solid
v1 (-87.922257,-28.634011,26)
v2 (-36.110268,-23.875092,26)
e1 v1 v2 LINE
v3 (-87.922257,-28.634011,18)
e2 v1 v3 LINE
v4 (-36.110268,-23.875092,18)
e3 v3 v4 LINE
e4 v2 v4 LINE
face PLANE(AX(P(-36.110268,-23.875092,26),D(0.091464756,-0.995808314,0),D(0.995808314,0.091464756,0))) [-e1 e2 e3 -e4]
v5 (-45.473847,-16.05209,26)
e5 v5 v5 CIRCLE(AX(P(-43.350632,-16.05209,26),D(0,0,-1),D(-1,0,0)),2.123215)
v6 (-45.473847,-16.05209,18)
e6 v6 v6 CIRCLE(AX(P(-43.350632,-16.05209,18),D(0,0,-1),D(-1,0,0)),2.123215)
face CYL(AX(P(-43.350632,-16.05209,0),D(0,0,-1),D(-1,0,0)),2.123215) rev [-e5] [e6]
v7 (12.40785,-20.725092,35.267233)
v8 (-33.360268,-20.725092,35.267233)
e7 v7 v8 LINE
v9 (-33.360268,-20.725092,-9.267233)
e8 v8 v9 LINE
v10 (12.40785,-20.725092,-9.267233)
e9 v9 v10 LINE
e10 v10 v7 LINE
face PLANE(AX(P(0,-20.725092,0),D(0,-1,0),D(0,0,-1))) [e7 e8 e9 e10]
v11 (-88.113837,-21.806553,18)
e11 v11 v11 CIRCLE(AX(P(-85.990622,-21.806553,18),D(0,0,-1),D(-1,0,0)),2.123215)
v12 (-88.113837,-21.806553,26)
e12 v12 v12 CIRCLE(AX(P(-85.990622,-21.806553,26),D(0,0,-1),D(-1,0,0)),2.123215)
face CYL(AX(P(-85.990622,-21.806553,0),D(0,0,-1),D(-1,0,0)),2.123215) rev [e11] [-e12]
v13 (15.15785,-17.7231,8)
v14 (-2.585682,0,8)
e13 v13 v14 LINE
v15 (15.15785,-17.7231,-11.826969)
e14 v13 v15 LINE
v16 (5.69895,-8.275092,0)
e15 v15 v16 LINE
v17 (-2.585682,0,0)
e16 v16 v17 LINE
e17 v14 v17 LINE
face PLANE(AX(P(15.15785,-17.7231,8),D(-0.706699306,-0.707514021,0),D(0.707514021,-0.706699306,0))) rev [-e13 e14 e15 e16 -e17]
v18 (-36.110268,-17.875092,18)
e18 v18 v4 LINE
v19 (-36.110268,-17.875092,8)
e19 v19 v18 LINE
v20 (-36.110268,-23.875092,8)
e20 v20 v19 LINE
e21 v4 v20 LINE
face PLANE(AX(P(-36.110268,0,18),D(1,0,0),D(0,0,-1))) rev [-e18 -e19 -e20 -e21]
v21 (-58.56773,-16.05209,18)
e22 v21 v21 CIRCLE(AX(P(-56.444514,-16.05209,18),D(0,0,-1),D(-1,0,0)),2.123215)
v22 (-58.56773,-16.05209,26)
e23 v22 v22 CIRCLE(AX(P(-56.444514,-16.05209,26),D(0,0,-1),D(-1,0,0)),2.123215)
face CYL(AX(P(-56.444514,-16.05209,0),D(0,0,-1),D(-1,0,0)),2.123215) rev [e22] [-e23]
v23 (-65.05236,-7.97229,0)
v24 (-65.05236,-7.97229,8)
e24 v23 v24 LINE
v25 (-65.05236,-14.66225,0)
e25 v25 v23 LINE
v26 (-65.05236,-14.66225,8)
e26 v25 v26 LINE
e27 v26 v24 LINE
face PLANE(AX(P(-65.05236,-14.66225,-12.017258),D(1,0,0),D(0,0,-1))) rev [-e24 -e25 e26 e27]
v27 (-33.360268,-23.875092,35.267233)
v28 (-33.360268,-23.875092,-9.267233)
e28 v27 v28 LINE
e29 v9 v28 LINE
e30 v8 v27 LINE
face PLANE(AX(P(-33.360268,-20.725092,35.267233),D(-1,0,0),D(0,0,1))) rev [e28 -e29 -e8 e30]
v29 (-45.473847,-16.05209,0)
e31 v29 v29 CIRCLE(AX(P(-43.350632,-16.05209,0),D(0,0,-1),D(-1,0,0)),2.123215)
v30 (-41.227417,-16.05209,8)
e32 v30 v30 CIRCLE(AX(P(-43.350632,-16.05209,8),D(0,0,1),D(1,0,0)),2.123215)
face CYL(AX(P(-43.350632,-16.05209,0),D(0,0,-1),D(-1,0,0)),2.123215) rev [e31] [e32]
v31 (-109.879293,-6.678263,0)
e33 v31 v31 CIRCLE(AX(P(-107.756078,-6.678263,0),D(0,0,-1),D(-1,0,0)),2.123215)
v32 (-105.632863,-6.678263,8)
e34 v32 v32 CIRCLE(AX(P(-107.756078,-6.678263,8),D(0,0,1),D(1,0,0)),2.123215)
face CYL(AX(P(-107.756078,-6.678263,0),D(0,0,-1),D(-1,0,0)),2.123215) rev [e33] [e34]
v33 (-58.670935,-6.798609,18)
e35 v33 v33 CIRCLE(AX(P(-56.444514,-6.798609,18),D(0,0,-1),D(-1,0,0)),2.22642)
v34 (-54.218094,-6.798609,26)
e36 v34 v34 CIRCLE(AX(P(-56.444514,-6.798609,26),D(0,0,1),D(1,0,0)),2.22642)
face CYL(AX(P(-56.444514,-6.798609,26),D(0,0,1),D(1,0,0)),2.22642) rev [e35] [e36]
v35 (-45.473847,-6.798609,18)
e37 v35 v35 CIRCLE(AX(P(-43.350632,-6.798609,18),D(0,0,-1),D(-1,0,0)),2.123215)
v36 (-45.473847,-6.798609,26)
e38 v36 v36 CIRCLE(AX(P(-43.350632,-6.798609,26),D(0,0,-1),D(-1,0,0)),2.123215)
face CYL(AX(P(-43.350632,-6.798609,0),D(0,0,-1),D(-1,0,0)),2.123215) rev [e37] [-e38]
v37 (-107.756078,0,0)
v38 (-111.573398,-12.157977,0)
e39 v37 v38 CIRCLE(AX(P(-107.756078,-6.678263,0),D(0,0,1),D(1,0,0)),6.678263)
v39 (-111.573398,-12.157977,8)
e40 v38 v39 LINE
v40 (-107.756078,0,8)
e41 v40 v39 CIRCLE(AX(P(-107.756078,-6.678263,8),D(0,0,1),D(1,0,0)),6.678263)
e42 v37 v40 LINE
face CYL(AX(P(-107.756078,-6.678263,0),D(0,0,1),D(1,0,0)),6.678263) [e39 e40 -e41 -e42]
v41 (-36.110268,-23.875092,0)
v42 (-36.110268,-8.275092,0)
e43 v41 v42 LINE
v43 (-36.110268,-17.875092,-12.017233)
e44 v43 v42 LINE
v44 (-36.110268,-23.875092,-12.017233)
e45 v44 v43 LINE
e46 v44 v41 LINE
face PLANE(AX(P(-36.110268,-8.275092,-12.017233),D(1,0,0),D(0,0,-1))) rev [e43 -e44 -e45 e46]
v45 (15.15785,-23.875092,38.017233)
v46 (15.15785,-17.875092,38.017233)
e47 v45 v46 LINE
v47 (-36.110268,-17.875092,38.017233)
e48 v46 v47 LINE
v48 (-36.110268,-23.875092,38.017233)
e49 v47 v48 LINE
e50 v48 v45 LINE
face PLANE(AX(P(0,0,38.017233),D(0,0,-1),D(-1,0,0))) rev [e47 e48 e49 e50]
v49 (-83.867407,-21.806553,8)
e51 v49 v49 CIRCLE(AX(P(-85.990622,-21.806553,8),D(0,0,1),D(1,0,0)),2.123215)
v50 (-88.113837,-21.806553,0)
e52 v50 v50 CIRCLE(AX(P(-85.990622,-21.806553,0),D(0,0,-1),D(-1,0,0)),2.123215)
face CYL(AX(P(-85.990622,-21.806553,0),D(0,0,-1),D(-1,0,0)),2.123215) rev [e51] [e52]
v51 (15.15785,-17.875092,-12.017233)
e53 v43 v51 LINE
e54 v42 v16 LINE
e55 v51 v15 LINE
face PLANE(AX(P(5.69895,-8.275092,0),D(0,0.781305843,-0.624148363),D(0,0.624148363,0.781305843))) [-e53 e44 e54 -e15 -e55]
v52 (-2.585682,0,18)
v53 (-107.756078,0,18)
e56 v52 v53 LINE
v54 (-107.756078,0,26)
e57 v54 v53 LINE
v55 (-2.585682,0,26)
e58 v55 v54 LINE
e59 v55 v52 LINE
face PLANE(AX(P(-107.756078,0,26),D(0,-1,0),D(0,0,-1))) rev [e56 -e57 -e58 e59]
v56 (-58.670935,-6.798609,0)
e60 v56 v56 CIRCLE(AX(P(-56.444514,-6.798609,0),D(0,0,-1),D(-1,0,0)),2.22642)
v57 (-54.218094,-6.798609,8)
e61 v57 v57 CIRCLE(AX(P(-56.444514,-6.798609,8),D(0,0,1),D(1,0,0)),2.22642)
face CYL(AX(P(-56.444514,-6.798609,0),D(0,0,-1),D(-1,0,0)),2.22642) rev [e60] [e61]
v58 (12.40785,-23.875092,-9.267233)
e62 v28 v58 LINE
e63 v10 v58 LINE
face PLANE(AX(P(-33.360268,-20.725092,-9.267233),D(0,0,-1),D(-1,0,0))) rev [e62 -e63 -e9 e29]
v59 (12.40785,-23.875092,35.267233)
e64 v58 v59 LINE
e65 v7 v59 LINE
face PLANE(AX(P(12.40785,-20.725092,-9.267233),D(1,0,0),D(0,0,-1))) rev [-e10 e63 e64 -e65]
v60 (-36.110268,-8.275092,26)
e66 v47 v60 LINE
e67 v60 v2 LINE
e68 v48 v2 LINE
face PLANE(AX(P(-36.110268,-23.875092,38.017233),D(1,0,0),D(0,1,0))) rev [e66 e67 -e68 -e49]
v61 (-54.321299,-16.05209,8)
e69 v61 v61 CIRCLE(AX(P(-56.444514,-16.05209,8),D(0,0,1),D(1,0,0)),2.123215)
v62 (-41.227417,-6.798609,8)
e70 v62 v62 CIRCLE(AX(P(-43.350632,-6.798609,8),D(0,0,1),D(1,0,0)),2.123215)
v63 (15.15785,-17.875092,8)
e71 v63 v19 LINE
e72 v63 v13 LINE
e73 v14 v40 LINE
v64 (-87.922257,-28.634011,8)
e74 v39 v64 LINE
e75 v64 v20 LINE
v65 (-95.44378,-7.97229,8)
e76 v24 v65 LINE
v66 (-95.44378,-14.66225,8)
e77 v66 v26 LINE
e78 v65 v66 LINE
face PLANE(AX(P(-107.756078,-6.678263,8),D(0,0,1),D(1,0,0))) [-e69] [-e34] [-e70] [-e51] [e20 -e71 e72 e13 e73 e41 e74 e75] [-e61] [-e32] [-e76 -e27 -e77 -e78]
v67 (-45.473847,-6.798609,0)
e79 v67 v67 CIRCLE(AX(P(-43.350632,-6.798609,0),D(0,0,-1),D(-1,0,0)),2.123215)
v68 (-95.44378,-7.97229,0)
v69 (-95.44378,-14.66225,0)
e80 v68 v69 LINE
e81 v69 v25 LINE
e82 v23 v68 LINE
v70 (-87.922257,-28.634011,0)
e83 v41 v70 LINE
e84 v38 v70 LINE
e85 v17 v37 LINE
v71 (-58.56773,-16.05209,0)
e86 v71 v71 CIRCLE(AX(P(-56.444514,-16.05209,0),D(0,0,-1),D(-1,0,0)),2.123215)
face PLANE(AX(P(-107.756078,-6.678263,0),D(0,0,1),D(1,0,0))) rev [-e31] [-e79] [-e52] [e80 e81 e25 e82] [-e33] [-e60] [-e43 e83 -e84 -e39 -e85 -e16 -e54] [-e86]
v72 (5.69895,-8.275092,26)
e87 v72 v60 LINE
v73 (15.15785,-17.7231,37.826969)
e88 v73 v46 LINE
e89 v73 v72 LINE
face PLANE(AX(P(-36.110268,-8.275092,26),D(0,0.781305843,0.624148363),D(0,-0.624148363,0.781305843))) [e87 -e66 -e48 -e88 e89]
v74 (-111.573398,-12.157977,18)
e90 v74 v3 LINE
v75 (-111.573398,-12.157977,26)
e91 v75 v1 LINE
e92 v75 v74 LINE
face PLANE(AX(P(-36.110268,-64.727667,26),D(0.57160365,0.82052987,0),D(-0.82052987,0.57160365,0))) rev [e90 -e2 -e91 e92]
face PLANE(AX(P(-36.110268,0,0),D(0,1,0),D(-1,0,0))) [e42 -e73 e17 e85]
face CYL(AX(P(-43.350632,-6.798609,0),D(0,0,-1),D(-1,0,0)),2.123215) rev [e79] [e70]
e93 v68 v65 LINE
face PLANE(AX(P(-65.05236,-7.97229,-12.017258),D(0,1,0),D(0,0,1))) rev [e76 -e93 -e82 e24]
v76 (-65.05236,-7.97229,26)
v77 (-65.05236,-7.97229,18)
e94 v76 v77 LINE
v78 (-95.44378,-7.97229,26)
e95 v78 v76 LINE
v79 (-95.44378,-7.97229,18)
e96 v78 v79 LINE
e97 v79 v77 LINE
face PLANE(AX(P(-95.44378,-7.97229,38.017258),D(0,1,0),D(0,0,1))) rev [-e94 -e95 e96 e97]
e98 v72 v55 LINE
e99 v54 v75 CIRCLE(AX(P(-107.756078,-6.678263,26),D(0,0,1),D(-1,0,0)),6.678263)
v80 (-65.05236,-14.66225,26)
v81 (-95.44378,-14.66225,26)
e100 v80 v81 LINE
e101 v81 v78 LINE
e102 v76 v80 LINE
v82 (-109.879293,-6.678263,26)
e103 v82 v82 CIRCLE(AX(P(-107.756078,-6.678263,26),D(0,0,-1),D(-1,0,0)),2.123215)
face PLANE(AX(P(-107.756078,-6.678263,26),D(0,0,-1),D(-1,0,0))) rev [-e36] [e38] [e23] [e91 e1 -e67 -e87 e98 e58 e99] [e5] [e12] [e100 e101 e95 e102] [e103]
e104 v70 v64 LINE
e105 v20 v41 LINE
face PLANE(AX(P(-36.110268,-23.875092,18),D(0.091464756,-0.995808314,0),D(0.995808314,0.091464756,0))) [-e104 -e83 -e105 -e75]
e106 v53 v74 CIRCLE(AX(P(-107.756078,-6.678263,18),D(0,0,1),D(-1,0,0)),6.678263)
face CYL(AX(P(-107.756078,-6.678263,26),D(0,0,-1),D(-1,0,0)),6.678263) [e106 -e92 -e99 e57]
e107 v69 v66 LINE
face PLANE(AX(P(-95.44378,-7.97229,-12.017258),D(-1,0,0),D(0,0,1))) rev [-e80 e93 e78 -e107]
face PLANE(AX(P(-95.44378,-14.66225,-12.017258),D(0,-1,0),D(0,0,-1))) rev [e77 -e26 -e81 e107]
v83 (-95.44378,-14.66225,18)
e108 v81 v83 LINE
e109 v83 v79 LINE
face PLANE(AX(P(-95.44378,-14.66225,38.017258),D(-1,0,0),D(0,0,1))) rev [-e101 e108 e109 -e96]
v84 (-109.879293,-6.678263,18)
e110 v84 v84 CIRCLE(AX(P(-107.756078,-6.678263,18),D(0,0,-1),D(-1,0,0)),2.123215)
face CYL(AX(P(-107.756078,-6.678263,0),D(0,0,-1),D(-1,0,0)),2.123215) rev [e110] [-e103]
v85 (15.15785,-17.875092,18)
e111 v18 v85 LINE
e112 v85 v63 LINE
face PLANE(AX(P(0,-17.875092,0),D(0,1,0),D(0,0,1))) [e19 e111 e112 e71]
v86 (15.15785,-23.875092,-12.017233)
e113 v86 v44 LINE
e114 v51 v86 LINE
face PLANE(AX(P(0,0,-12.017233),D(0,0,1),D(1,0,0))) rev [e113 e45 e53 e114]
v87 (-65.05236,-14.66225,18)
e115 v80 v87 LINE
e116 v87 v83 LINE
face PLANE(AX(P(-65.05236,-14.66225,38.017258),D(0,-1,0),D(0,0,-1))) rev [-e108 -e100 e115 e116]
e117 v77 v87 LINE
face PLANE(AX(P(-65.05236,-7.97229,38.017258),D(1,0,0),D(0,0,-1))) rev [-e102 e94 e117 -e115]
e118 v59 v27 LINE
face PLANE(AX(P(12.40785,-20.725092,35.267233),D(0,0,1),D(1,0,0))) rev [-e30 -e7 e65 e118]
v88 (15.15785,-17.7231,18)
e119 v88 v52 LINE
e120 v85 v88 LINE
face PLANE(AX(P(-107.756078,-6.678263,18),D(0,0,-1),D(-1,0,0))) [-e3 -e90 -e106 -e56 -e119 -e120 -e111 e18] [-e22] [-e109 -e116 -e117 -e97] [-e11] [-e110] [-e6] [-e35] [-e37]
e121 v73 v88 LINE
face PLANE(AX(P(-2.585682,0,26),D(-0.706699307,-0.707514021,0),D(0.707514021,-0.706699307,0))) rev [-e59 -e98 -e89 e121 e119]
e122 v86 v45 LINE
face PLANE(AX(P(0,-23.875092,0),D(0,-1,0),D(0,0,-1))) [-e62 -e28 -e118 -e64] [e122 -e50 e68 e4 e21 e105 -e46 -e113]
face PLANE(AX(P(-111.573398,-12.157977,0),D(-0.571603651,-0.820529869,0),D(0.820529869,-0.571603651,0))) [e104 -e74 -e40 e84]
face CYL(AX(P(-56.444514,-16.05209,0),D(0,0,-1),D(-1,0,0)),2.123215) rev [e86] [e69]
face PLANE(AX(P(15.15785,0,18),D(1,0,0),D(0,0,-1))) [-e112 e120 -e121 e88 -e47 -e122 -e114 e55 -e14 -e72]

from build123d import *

# Parameters (mm, degrees)
RESSALTO_EXTRUS_O1_DEPTH         = 8
RESSALTO_EXTRUS_O2_DEPTH         = 51.268117765
CORTE_EXTRUS_O1_DEPTH            = 8.000000002
ESBO_O4_W                        = 51.268117776
ESBO_O4_H                        = 10.000000011
CORTE_EXTRUS_O2_DEPTH            = 17.723100001
CORTE_EXTRUS_O3_DEPTH            = 40.852574409
ESBO_O6_W                        = 51.268117776
ESBO_O6_H                        = 10.000000011
CORTE_EXTRUS_O4_DEPTH            = 0.151992449
RESSALTO_EXTRUS_O3_START         = 7.999999998
RESSALTO_EXTRUS_O3_DEPTH         = 7.999999998
RESSALTO_EXTRUS_O4_DEPTH         = 12.017232655
RESSALTO_EXTRUS_O5_DEPTH         = 12.017232657
ESBO_O10_W                       = 30.391419991
ESBO_O10_H                       = 6.689959998
CORTE_EXTRUS_O5_DEPTH            = 135.855194678
ESBO_O11_W                       = 30.391419991
ESBO_O11_H                       = 6.689959998
CORTE_EXTRUS_O6_DEPTH            = 135.855194677
ESBO_O12_W                       = 45.768117767
ESBO_O12_H                       = 44.53446532
CORTE_EXTRUS_O7_DEPTH            = 3.15
INCLINA_O1_START                 = 9.762479363
INCLINA_O1_DEPTH                 = 8.237520637
INCLINA_O2_START                 = -6.465378083
INCLINA_O2_DEPTH                 = 8.465378083
INCLINA_O3_ANGLE                 = 84.752120974
FURO_COM_FOLGA_DE_M41_D          = 4.452840696
FURO_COM_FOLGA_DE_M41_DEPTH      = 7.999999998
FURO_DE_DI_METRO_4_2_4_2_1_D     = 4.2
FURO_DE_DI_METRO_4_2_4_2_1_DEPTH = 7.999999998
FURO_COM_FOLGA_DE_M42_D          = 4.452840696
FURO_COM_FOLGA_DE_M42_DEPTH      = 38.017232657
FURO1_D                          = 4.246430182
FURO1_DEPTH                      = 38.017232657


with BuildPart() as part:
    # Esboço1 → Ressalto-extrusão1 (new body)
    with BuildSketch(Plane.XY.offset(8)):
        with BuildLine():
            Line((-36.110267765, -64.727666859), (-36.110267765, 0))
            Line((-36.110267765, 0), (-107.75607805, 0))
            ThreePointArc((-107.75607805, 0), (-114.12766225, -4.677735132), (-111.573397577, -12.157977319))
            Line((-111.573397577, -12.157977319), (-36.110267765, -64.727666859))
        make_face()
    extrude(amount=-RESSALTO_EXTRUS_O1_DEPTH)

    # Esboço2 → Ressalto-extrusão2 (add)
    with BuildSketch(Plane(origin=(-36.110267765, 0, 0), x_dir=(0, 0, -1), z_dir=(1, 0, 0))):
        with BuildLine():
            Line((2e-09, 1e-09), (2e-09, -23.87509245))
            add(Edge.make_bspline(
                [(2e-09, -64.727666859), (2e-09, -51.110142056), (2e-09, -37.492617253), (2e-09, -23.87509245)],
                knots=[0, 0, 0, 0, 1, 1, 1, 1], degree=3))
            Line((2e-09, -64.727666859), (-18.000000002, -64.727666859))
            add(Edge.make_bspline(
                [(-18.000000002, -64.727666859), (-18.000000002, -51.110142056), (-18.000000002, -37.492617253), (-18.000000002, -23.87509245)],
                knots=[0, 0, 0, 0, 1, 1, 1, 1], degree=3))
            Line((-18.000000002, -23.87509245), (-18.000000002, -17.875092449))
            add(Edge.make_bspline(
                [(-18.000000002, -17.723099999), (-18.000000002, -17.773764149), (-18.000000002, -17.824428299), (-18.000000002, -17.875092449)],
                knots=[0, 0, 0, 0, 1, 1, 1, 1], degree=3))
            add(Edge.make_bspline(
                [(-18.000000002, 1e-09), (-18.000000002, -5.907699999), (-18.000000002, -11.815399999), (-18.000000002, -17.723099999)],
                knots=[0, 0, 0, 0, 1, 1, 1, 1], degree=3))
            Line((-18.000000002, 1e-09), (2e-09, 1e-09))
        make_face()
    extrude(amount=RESSALTO_EXTRUS_O2_DEPTH)

    # Esboço3 → Corte-extrusão1 (cut)
    with BuildSketch(Plane(origin=(0, 0, 0), x_dir=(-1, 0, 0), z_dir=(0, 0, -1))):
        Polygon((-15.15785, 0), (-15.15785, -17.7231), (2.585682, 0), align=None)
    extrude(amount=-CORTE_EXTRUS_O1_DEPTH, mode=Mode.SUBTRACT)

    # Esboço4 → Corte-extrusão2 (cut)
    with BuildSketch(Plane(origin=(0, 0, 0), x_dir=(-1, 0, 0), z_dir=(0, 1, 0))):
        with Locations((10.476208888, 13.000000002)):
            Rectangle(ESBO_O4_W, ESBO_O4_H)
    extrude(amount=-CORTE_EXTRUS_O2_DEPTH, mode=Mode.SUBTRACT)

    # Esboço5 → Corte-extrusão3 (cut)
    with BuildSketch(Plane.XZ.offset(64.727666859)):
        Polygon((15.15785, 18.000000002), (-36.110267765, 18.000000002), (-36.110267765, 8), (-36.110267765, -2e-09), (15.15785, -2e-09), align=None)
    extrude(amount=-CORTE_EXTRUS_O3_DEPTH, mode=Mode.SUBTRACT)

    # Esboço6 → Corte-extrusão4 (cut)
    with BuildSketch(Plane(origin=(0, -17.723100001, 0), x_dir=(-1, 0, 0), z_dir=(0, 1, 0))):
        with Locations((10.476208888, 13.000000002)):
            Rectangle(ESBO_O6_W, ESBO_O6_H)
    extrude(amount=-CORTE_EXTRUS_O4_DEPTH, mode=Mode.SUBTRACT)

    # Esboço7 → Ressalto-extrusão3 (add)
    with BuildSketch(Plane.XY.offset(18.000000002).offset(RESSALTO_EXTRUS_O3_START)):
        with BuildLine():
            Line((-36.110267767, -23.87509245), (-36.110267767, -64.727666793))
            Line((-36.110267767, -64.727666793), (-111.573397573, -12.157977315))
            ThreePointArc((-111.573397573, -12.157977315), (-114.127662248, -4.677735132), (-107.75607805, 1e-09))
            Line((-107.75607805, 1e-09), (-2.585681995, 1e-09))
            Line((-2.585681995, 1e-09), (5.698950337, -8.275092449))
            Line((5.698950337, -8.275092449), (15.157849978, -17.723100021))
            Line((15.157849978, -17.723100021), (15.157849978, -23.87509245))
            Line((15.157849978, -23.87509245), (-36.110267767, -23.87509245))
        make_face()
    extrude(amount=-RESSALTO_EXTRUS_O3_DEPTH)

    # Esboço8 → Ressalto-extrusão4 (add)
    with BuildSketch(Plane(origin=(0, 0, 0), x_dir=(-1, 0, 0), z_dir=(0, 0, -1))):
        Polygon((36.110267765, -8.275092449), (36.110267765, -23.87509245), (-15.15785, -23.87509245), (-15.15785, -17.7231), (-5.698950354, -8.275092449), align=None)
    extrude(amount=RESSALTO_EXTRUS_O4_DEPTH)

    # Esboço9 → Ressalto-extrusão5 (add)
    with BuildSketch(Plane.XY.offset(26)):
        Polygon((15.15785, -17.7231), (15.15785, -23.87509245), (-36.110267765, -23.87509245), (-36.110267765, -8.275092449), (5.698950354, -8.275092449), align=None)
    extrude(amount=RESSALTO_EXTRUS_O5_DEPTH)

    # Esboço10 → Corte-extrusão5 (cut, through all)
    with BuildSketch(Plane.XY.offset(8)):
        with Locations((-80.248070001, -11.317270001)):
            Rectangle(ESBO_O10_W, ESBO_O10_H)
    extrude(amount=-CORTE_EXTRUS_O5_DEPTH, mode=Mode.SUBTRACT)

    # Esboço11 → Corte-extrusão6 (cut, through all)
    with BuildSketch(Plane(origin=(0, 0, 18.000000002), x_dir=(-1, 0, 0), z_dir=(0, 0, -1))):
        with Locations((80.248070001, -11.317270001)):
            Rectangle(ESBO_O11_W, ESBO_O11_H)
    extrude(amount=-CORTE_EXTRUS_O6_DEPTH, mode=Mode.SUBTRACT)

    # Esboço12 → Corte-extrusão7 (cut)
    with BuildSketch(Plane.XZ.offset(23.87509245)):
        with Locations((-10.476208882, 13)):
            Rectangle(ESBO_O12_W, ESBO_O12_H)
    extrude(amount=-CORTE_EXTRUS_O7_DEPTH, mode=Mode.SUBTRACT)

    # Inclinação1: read off the stored shape, not the designer's step
    # Inclinação1 outline → Inclinação1 (cut)
    with BuildSketch(Plane(origin=(0, 0, 0), x_dir=(1, 0, 0), z_dir=(0, 0.7813058431702609, 0.624148363314371)).offset(INCLINA_O1_START)):
        Polygon((-36.110267765, -40.859795712), (15.15785, -40.859795712), (15.15785, -40.616276003), (5.698950337, -25.478837331), (-36.110267765, -25.478837331), align=None)
    extrude(amount=INCLINA_O1_DEPTH, mode=Mode.SUBTRACT)

    # Inclinação2: read off the stored shape, not the designer's step
    # Inclinação2 outline → Inclinação2 (cut)
    with BuildSketch(Plane(origin=(0, 0, 0), x_dir=(1, 0, 0), z_dir=(0, 0.7813058431702609, -0.624148363314371)).offset(INCLINA_O2_START)):
        Polygon((5.698950354, 5.164885408), (15.15785, 20.302324047), (15.15785, 20.545843787), (-36.110267765, 20.545843787), (-36.110267765, 5.164885408), align=None)
    extrude(amount=INCLINA_O2_DEPTH, mode=Mode.SUBTRACT)

    # Inclinação3
    inclina_o3_faces = [part.faces().sort_by_distance(p)[0] for p in [
        (-36.110267765, -44.301379654, 3.999999999),
        (-36.110267767, -44.301379621, 22.000000001),
    ]]
    draft(inclina_o3_faces, Plane(origin=(0, -23.87509245, 0), x_dir=(0, 0, -1), z_dir=(0, -1, 0)), INCLINA_O3_ANGLE)

    # Furo com folga de M41
    with Locations(Plane.XY.offset(26)):
        with Locations((-56.444514416, -6.798608997)):
            Hole(FURO_COM_FOLGA_DE_M41_D / 2, depth=FURO_COM_FOLGA_DE_M41_DEPTH)

    # Furo de diâmetro Ø4.2 (4.2)1
    with Locations(Plane.XY.offset(26)):
        with Locations((-85.990622049, -21.806552958), (-107.75607805, -6.678263028), (-43.350632153, -6.798608997), (-56.444514416, -16.052089875), (-43.350632153, -16.052089875)):
            Hole(FURO_DE_DI_METRO_4_2_4_2_1_D / 2, depth=FURO_DE_DI_METRO_4_2_4_2_1_DEPTH)

    # Furo com folga de M42
    with Locations(Plane(origin=(0, 0, 0), x_dir=(-1, 0, 0), z_dir=(0, 0, -1))):
        with Locations((56.444514416, -6.798608997)):
            Hole(FURO_COM_FOLGA_DE_M42_D / 2, depth=FURO_COM_FOLGA_DE_M42_DEPTH)

    # Furo1
    with Locations(Plane(origin=(0, 0, 0), x_dir=(-1, 0, 0), z_dir=(0, 0, -1))):
        with Locations((43.350632153, -16.052089875), (56.444514416, -16.052089875), (43.350632153, -6.798608997), (107.75607805, -6.678263028), (85.990622049, -21.806552958)):
            Hole(FURO1_D / 2, depth=FURO1_DEPTH)


solid = part.part
